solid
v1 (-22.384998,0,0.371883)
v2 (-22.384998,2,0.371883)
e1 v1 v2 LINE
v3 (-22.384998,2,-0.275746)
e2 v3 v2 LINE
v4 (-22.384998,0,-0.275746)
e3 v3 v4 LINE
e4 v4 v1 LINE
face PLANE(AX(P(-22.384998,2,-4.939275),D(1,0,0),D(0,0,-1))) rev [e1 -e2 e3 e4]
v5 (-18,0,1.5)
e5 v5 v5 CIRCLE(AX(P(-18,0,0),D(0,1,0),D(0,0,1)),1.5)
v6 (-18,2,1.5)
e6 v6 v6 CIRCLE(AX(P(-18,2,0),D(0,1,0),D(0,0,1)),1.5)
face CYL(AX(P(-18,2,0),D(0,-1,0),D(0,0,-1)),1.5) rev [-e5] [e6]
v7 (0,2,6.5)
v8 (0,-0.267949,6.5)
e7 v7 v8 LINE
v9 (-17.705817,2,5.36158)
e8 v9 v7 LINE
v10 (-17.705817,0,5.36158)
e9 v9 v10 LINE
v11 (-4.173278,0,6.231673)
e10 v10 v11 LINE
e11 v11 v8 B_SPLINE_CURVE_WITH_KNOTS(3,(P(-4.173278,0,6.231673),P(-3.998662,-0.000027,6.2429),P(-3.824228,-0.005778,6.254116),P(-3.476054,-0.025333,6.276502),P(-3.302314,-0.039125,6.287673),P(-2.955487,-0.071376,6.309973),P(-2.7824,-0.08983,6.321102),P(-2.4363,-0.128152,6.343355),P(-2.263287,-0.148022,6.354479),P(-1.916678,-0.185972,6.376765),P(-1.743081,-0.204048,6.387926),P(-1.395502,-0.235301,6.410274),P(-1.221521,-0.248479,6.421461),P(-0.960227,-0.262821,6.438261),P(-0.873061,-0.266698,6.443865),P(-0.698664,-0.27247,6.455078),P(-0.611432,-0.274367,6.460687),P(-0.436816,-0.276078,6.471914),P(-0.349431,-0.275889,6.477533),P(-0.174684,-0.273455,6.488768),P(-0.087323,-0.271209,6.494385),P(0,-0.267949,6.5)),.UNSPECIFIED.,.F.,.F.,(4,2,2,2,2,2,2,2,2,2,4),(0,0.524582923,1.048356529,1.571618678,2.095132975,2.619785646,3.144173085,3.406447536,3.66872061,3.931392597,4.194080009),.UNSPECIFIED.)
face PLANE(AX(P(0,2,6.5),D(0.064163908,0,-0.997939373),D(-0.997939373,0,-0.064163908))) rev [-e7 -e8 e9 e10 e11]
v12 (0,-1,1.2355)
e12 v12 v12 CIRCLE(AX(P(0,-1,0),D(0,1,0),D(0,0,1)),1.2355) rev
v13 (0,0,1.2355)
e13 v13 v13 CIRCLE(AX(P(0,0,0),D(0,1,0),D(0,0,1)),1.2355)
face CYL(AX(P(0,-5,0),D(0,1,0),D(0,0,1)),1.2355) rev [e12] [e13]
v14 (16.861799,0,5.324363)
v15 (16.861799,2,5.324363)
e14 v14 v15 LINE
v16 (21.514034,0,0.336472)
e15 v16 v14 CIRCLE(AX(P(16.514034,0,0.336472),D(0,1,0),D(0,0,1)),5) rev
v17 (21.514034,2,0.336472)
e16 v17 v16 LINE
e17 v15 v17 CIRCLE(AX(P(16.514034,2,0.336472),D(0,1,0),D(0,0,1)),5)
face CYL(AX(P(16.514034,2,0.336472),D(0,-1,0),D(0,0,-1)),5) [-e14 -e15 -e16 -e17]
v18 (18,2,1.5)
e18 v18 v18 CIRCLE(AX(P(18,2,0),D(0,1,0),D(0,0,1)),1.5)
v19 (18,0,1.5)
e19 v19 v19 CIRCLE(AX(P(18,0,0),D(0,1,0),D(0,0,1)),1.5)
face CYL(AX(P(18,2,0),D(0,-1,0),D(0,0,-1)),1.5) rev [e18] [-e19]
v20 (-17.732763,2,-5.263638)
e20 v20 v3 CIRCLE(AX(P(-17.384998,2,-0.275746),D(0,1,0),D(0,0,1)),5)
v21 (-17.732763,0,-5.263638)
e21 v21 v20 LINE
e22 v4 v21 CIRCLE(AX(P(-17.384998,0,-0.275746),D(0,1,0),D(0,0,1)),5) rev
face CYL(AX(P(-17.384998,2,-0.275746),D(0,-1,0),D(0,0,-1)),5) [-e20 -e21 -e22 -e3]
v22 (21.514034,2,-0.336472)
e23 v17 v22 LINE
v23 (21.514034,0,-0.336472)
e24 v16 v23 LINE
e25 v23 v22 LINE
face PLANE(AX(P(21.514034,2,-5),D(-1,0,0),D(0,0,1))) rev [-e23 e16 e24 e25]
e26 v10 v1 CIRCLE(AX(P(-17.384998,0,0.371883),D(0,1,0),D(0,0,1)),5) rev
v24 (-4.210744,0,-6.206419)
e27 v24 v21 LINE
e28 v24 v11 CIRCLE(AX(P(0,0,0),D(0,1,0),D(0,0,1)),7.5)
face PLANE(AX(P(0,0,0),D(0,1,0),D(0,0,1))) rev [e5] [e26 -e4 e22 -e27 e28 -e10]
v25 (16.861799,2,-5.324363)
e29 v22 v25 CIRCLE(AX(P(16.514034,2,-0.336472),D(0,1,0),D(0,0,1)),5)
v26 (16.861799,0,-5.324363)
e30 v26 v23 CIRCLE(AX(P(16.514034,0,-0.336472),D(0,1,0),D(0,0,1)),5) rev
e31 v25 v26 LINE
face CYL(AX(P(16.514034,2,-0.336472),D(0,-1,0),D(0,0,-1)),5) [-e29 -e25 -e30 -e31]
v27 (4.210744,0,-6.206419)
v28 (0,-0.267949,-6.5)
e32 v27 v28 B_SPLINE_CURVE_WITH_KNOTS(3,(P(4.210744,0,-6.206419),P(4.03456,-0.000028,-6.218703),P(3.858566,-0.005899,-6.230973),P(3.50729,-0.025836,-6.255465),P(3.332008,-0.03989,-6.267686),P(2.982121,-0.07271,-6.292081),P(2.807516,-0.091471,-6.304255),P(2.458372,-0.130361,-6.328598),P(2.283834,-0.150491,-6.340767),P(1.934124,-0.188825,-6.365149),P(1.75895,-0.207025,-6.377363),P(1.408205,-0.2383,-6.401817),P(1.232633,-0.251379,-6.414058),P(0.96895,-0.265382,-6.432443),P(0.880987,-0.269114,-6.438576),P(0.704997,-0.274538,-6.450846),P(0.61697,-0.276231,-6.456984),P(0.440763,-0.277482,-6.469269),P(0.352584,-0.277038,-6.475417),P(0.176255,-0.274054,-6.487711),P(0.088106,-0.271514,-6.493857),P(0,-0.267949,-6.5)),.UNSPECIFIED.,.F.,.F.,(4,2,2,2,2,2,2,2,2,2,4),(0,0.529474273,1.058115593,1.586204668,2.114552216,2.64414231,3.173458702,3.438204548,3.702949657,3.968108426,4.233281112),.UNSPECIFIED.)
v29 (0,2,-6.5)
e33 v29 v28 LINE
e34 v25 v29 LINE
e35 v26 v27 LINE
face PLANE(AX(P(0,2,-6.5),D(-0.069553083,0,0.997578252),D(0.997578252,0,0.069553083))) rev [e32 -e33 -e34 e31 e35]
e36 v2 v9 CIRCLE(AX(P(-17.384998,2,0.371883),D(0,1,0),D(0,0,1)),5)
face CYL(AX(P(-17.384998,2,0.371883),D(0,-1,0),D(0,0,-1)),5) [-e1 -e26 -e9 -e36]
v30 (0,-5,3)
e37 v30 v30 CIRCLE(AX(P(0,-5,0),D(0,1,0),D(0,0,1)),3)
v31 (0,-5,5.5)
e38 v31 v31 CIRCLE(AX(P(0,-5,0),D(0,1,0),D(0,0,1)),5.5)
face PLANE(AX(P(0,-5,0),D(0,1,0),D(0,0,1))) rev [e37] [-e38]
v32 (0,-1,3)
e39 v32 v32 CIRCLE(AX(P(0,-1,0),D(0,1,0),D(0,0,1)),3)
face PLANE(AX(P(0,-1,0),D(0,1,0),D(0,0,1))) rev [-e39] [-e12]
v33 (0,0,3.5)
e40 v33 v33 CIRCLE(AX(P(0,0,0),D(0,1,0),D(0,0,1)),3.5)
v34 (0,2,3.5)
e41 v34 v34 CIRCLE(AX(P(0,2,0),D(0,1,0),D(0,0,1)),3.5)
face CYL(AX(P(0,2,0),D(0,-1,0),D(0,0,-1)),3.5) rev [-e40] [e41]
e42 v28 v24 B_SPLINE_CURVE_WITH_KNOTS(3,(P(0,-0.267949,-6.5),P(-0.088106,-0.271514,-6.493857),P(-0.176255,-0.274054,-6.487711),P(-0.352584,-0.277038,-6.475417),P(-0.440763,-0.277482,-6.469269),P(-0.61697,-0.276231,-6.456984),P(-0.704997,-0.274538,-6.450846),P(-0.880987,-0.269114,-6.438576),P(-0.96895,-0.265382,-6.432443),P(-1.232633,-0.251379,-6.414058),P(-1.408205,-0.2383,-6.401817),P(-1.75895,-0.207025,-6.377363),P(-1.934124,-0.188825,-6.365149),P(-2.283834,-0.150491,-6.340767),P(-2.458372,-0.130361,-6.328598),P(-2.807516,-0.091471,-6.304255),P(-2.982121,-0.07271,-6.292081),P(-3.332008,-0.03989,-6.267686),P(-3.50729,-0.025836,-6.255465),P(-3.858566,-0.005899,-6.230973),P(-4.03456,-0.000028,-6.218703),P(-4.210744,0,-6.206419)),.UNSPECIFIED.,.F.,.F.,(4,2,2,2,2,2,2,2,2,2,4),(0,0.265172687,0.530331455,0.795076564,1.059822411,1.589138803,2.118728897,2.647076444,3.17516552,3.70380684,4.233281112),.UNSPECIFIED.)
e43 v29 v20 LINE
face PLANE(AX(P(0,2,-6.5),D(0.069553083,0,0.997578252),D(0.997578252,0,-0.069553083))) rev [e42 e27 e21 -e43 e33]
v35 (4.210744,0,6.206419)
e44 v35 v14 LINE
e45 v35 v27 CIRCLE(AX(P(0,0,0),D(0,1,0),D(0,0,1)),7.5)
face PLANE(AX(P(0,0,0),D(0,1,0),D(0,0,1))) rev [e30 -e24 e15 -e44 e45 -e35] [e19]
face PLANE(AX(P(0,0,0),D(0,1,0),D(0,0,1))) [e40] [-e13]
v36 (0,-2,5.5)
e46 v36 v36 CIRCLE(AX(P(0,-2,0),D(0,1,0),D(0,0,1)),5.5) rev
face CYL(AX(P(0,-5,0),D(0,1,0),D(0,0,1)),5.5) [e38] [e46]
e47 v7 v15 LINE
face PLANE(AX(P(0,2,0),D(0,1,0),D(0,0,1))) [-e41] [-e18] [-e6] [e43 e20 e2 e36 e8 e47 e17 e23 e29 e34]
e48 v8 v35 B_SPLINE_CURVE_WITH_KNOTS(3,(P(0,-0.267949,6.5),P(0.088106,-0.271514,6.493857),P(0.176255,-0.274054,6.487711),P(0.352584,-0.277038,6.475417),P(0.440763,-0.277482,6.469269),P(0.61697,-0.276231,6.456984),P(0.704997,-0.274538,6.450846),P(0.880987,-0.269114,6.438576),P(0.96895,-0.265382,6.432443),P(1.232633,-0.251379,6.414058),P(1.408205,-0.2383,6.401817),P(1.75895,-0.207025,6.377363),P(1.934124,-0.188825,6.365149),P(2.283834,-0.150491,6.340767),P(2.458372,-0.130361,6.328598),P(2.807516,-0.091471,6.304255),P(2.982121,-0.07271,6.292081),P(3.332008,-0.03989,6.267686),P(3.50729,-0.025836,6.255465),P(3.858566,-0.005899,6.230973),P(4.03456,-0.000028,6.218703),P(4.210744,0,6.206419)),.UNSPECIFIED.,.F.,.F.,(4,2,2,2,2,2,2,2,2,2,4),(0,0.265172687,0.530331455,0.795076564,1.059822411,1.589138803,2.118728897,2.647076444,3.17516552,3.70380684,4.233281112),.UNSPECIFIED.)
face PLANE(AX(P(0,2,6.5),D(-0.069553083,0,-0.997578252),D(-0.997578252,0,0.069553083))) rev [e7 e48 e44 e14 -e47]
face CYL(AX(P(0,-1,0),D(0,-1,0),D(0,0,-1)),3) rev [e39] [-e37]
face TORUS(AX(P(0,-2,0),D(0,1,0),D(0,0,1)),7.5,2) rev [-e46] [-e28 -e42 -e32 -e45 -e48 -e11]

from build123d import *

# Parameters (mm, degrees)
SKETCH1_R           = 3.5
SKETCH1_R_2         = 1.5
BOSS_EXTRUDE1_DEPTH = 2
FILLET2_R           = 5
SKETCH2_R           = 5.5
SKETCH2_R_2         = 1.235500329
BOSS_EXTRUDE2_DEPTH = 5
FILLET3_R           = 2
CUT_EXTRUDE1_START  = -5
SKETCH3_R           = 3
CUT_EXTRUDE1_DEPTH  = 4


with BuildPart() as part:
    # Sketch1 → Boss-Extrude1 (new body)
    with BuildSketch(Plane(origin=(0, 0, 0), x_dir=(1, 0, 0), z_dir=(0, 1, 0))):
        Polygon((0, 6.5), (-22.384997637, 4.939274727), (-22.384997637, -5.060725273), (0, -6.5), (21.514033914, -5), (21.514033914, 5), align=None)
        with Locations(Location((0, 0, 0), (0, 0, 270))):
            Circle(SKETCH1_R, mode=Mode.SUBTRACT)
        with Locations(Location((-18, 0, 0), (0, 0, 270))):
            Circle(SKETCH1_R_2, mode=Mode.SUBTRACT)
        with Locations(Location((18, 0, 0), (0, 0, 270))):
            Circle(SKETCH1_R_2, mode=Mode.SUBTRACT)
    extrude(amount=BOSS_EXTRUDE1_DEPTH)

    # Fillet2
    fillet2_edges = [part.edges().sort_by_distance(p)[0] for p in [
        (-22.384997637, 1, 5.060725273),
        (-22.384997637, 1, -4.939274727),
        (21.514033914, 1, -5),
        (21.514033914, 1, 5),
    ]]
    fillet(fillet2_edges, radius=FILLET2_R)

    # Sketch2 → Boss-Extrude2 (add)
    with BuildSketch(Plane(origin=(0, 0, 0), x_dir=(1, 0, 0), z_dir=(0, 1, 0))):
        with Locations(Location((0, 0, 0), (0, 0, 270))):
            Circle(SKETCH2_R)
        with Locations(Location((0, 0, 0), (0, 0, 270))):
            Circle(SKETCH2_R_2, mode=Mode.SUBTRACT)
    extrude(amount=-BOSS_EXTRUDE2_DEPTH)

    # Fillet3
    # the kernel refuses this fillet: 2 mm, written as the material it adds along each edge
    with BuildSketch(Plane(origin=(0, 0, 0), x_dir=(0, 0, 1), z_dir=(-1, 0, 0))) as fillet3_piece_1_section:
        with BuildLine():
            CenterArc((5.5 + FILLET3_R, -FILLET3_R), FILLET3_R, 90, 90)
            Line((5.5, -FILLET3_R), (5.5, 0))
            Line((5.5, 0), (5.5 + FILLET3_R, 0))
        make_face()
    fillet3_piece_1 = revolve(axis=Axis((0, 0, 0), (0, 1, 0)), mode=Mode.PRIVATE)
    fillet3_piece_1 = split(fillet3_piece_1, bisect_by=Plane(origin=(-0.030373147, -0.562249721, -6.497882326), z_dir=(0.06955308260096395, 0, 0.9975782519184666)), keep=Keep.TOP, mode=Mode.PRIVATE)
    fillet3_piece_1 = split(fillet3_piece_1, bisect_by=Plane(origin=(0.030373147, -0.562249721, -6.497882326), z_dir=(-0.06955308260096384, 0, 0.9975782519184666)), keep=Keep.TOP, mode=Mode.PRIVATE)
    fillet3_piece_1 = split(fillet3_piece_1, bisect_by=Plane(origin=(-0.804382076, -0.562249721, 6.44828113), z_dir=(0.06416390756024656, 0, -0.9979393733922919)), keep=Keep.TOP, mode=Mode.PRIVATE)
    fillet3_piece_1 = split(fillet3_piece_1, bisect_by=Plane(origin=(0.871627207, -0.562249721, 6.439228468), z_dir=(-0.06955308260096384, 0, -0.9975782519184666)), keep=Keep.TOP, mode=Mode.PRIVATE)
    add(fillet3_piece_1)

    # Sketch3 → Cut-Extrude1 (cut)
    with BuildSketch(Plane(origin=(0, 0, 0), x_dir=(1, 0, 0), z_dir=(0, 1, 0)).offset(CUT_EXTRUDE1_START)):
        with Locations(Location((0, 0, 0), (0, 0, 270))):
            Circle(SKETCH3_R)
    extrude(amount=CUT_EXTRUDE1_DEPTH, mode=Mode.SUBTRACT)


solid = part.part
